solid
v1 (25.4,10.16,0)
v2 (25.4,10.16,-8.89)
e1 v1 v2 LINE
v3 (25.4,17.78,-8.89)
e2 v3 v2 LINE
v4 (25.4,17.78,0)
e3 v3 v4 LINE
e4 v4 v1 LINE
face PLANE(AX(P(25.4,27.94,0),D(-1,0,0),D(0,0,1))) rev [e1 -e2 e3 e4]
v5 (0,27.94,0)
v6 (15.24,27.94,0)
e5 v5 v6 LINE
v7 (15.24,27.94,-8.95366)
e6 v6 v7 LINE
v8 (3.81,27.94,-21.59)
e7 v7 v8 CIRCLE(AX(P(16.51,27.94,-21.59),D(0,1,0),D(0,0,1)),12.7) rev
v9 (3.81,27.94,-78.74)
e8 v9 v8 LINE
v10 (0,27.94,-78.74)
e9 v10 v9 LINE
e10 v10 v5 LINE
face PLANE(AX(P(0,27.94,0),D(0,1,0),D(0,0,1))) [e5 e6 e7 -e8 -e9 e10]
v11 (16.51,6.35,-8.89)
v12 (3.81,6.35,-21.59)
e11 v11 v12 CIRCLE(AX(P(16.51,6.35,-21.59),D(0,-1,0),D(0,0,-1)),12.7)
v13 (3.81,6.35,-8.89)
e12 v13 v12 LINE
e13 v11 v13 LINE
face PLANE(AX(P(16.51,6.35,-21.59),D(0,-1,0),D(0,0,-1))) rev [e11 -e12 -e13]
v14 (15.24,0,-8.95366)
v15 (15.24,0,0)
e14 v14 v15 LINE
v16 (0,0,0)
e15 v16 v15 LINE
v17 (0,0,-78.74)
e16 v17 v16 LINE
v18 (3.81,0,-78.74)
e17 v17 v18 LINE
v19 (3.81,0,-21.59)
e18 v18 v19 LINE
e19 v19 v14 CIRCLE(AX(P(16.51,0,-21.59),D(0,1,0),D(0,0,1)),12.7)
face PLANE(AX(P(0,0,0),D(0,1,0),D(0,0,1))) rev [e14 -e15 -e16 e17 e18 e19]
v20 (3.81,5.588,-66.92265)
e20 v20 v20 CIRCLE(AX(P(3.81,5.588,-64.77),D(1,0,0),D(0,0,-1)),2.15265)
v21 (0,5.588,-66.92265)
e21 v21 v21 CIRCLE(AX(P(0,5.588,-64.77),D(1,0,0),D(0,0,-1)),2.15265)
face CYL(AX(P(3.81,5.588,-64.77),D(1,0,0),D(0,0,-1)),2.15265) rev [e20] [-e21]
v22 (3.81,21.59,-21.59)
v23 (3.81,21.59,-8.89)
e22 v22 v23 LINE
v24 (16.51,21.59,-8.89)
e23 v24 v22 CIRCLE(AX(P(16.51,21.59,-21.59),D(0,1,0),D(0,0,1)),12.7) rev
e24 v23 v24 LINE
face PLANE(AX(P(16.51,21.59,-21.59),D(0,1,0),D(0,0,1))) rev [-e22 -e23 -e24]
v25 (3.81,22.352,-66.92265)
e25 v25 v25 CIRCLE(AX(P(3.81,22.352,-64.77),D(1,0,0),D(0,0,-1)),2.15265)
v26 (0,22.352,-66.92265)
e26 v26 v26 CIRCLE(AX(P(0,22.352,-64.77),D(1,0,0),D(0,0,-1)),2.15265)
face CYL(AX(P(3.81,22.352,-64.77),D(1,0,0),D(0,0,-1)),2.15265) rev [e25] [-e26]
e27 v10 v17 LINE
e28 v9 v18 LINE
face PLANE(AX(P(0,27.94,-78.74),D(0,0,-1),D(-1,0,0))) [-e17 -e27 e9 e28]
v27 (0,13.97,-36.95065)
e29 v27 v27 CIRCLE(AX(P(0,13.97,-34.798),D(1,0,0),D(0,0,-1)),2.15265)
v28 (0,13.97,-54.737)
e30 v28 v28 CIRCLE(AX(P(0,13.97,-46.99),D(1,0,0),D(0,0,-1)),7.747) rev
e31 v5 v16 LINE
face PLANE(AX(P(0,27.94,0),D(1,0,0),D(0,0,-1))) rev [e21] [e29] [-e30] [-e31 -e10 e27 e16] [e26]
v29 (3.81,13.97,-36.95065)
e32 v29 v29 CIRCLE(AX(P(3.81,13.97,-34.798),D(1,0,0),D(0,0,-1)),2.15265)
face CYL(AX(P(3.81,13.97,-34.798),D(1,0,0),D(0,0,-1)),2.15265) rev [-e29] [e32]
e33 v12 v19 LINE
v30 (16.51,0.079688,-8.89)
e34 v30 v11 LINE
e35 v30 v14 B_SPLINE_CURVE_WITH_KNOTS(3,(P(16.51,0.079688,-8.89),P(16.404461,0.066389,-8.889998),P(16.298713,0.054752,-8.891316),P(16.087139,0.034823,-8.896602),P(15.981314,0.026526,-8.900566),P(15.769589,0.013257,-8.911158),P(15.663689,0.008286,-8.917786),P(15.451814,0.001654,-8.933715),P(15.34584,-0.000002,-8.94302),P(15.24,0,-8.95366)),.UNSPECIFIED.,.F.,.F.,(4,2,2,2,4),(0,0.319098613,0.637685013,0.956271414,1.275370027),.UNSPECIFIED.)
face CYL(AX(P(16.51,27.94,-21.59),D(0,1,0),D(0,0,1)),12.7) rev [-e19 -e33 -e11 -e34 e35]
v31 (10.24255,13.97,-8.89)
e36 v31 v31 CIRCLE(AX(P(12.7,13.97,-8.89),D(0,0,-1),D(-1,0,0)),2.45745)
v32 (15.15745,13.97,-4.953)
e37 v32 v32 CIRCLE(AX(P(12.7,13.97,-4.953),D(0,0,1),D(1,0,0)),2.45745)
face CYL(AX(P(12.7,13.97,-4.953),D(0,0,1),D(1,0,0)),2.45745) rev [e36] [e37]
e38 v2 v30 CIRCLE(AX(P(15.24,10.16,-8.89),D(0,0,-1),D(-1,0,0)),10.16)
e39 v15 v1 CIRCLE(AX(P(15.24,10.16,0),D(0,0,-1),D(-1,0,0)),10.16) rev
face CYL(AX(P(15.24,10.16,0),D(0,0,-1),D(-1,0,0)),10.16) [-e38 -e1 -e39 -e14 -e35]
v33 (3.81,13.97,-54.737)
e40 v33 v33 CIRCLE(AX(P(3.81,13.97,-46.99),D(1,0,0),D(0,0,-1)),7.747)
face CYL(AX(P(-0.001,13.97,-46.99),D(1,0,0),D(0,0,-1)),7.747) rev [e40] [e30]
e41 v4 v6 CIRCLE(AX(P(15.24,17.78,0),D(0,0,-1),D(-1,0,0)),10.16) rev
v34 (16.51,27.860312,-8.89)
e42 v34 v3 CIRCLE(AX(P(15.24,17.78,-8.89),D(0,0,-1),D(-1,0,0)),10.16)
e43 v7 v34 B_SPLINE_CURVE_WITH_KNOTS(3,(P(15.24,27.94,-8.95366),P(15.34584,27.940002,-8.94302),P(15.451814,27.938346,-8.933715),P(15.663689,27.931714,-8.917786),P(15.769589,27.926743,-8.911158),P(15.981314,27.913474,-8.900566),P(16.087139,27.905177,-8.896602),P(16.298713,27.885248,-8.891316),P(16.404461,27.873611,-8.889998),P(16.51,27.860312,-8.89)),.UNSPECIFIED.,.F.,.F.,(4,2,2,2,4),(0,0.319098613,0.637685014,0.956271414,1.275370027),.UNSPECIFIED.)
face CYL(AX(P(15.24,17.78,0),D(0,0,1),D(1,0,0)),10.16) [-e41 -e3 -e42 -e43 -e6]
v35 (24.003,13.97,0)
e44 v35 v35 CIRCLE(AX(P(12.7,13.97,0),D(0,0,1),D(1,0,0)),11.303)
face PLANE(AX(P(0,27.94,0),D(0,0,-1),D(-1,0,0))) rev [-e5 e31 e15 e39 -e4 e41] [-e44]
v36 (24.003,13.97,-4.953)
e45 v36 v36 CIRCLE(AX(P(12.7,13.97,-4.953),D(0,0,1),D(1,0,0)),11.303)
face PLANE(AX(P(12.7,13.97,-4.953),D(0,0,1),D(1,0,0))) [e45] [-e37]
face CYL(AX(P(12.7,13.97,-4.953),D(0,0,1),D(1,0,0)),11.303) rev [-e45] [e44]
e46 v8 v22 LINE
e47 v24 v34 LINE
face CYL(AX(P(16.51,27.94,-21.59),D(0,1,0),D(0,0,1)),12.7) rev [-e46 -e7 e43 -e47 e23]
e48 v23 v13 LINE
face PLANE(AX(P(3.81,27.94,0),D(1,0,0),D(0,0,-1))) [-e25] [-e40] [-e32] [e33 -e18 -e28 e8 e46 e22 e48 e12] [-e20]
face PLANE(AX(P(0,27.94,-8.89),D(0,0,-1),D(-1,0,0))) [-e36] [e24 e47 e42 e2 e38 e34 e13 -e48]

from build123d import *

# Parameters (mm, degrees)
SKETCH1_W                 = 3.81
SKETCH1_H                 = 78.74
SKETCH1_W_2               = 21.59
SKETCH1_H_2               = 8.89
BOSS_EXTRUDE1_DEPTH       = 27.94
SKETCH2_R                 = 11.303
CUT_EXTRUDE1_DEPTH        = 4.953
F_8_CLEARANCE_HOLE1_D     = 4.9149
CUT_EXTRUDE4_REACH        = 88.295
SKETCH5_R                 = 7.747
F_6_CLEARANCE_HOLE1_D     = 4.3053
F_6_CLEARANCE_HOLE1_DEPTH = 3.81
FILLET1_DEPTH             = 6.35
FILLET2_START             = 21.59
FILLET2_DEPTH             = 6.35
FILLET3_R                 = 10.16


with BuildPart() as part:
    # Sketch1 → Boss-Extrude1 (new body)
    with BuildSketch(Plane(origin=(0, 0, 0), x_dir=(1, 0, 0), z_dir=(0, 1, 0))):
        with Locations((1.905, 39.37)):
            Rectangle(SKETCH1_W, SKETCH1_H)
        with Locations((14.605, 4.445)):
            Rectangle(SKETCH1_W_2, SKETCH1_H_2)
    extrude(amount=BOSS_EXTRUDE1_DEPTH)

    # Sketch2 → Cut-Extrude1 (cut)
    with BuildSketch(Plane.XY):
        with Locations((12.7, 13.97)):
            Circle(SKETCH2_R)
    extrude(amount=-CUT_EXTRUDE1_DEPTH, mode=Mode.SUBTRACT)

    # #8 Clearance Hole1 (through all)
    with Locations(Plane.XY.offset(-4.953)):
        with Locations((12.7, 13.97)):
            Hole(F_8_CLEARANCE_HOLE1_D / 2)

    # Sketch5 → Cut-Extrude4 (cut, up to next)
    with BuildSketch(Plane(origin=(3.81, 0, 0), x_dir=(0, 0, -1), z_dir=(1, 0, 0)), mode=Mode.PRIVATE) as cut_extrude4_sk1:
        with Locations((46.99, 13.97)):
            Circle(SKETCH5_R)
    cut_extrude4_tool1 = extrude(cut_extrude4_sk1.sketch, amount=-CUT_EXTRUDE4_REACH, mode=Mode.PRIVATE) & part.part
    # Sketch5 → Cut-Extrude4 (cut, up to next)
    with BuildSketch(Plane(origin=(3.81, 0, 0), x_dir=(0, 0, -1), z_dir=(1, 0, 0)), mode=Mode.PRIVATE) as cut_extrude4_sk2:
        with BuildLine():
            ThreePointArc((54.737, 13.97), (46.99, 21.717), (39.243, 13.97))
            Line((39.243, 13.97), (54.737, 13.97))
        make_face()
    cut_extrude4_tool2 = extrude(cut_extrude4_sk2.sketch, amount=-CUT_EXTRUDE4_REACH, mode=Mode.PRIVATE) & part.part
    # Sketch5 → Cut-Extrude4 (cut, up to next)
    with BuildSketch(Plane(origin=(3.81, 0, 0), x_dir=(0, 0, -1), z_dir=(1, 0, 0)), mode=Mode.PRIVATE) as cut_extrude4_sk3:
        with BuildLine():
            Line((54.737, 13.97), (39.243, 13.97))
            ThreePointArc((39.243, 13.97), (46.99, 6.223), (54.737, 13.97))
        make_face()
    cut_extrude4_tool3 = extrude(cut_extrude4_sk3.sketch, amount=-CUT_EXTRUDE4_REACH, mode=Mode.PRIVATE) & part.part
    add(cut_extrude4_tool1.solids().sort_by_distance((3.81, 13.97, -46.99))[0], mode=Mode.SUBTRACT)
    add(cut_extrude4_tool2.solids().sort_by_distance((3.81, 17.257929, -46.99))[0], mode=Mode.SUBTRACT)
    add(cut_extrude4_tool3.solids().sort_by_distance((3.81, 10.682071, -46.99))[0], mode=Mode.SUBTRACT)

    # #6 Clearance Hole1
    with Locations(Plane(origin=(3.81, 0, 0), x_dir=(0, 0, -1), z_dir=(1, 0, 0))):
        with Locations((34.798, 13.97), (46.99, 13.97), (64.77, 22.352), (64.77, 5.588)):
            Hole(F_6_CLEARANCE_HOLE1_D / 2, depth=F_6_CLEARANCE_HOLE1_DEPTH)

    # Fillet1: read off the stored shape, not the designer's step
    # Fillet1 outline → Fillet1 (add)
    with BuildSketch(Plane(origin=(0, 0, 0), x_dir=(1, 0, 0), z_dir=(0, 1, 0))):
        with BuildLine():
            ThreePointArc((16.51, 8.89), (7.529743879, 12.609743879), (3.81, 21.59))
            Line((3.81, 21.59), (3.81, 8.89))
            Line((3.81, 8.89), (16.51, 8.89))
        make_face()
    extrude(amount=FILLET1_DEPTH)

    # Fillet2: read off the stored shape, not the designer's step
    # Fillet2 outline → Fillet2 (add)
    with BuildSketch(Plane(origin=(0, 0, 0), x_dir=(1, 0, 0), z_dir=(0, 1, 0)).offset(FILLET2_START)):
        with BuildLine():
            ThreePointArc((16.51, 8.89), (7.529743879, 12.609743879), (3.81, 21.59))
            Line((3.81, 21.59), (3.81, 8.89))
            Line((3.81, 8.89), (16.51, 8.89))
        make_face()
    extrude(amount=FILLET2_DEPTH)

    # Fillet3
    fillet3_edges = [part.edges().sort_by_distance(p)[0] for p in [
        (25.4, 0, -4.445),
        (25.4, 27.94, -4.445),
    ]]
    fillet(fillet3_edges, radius=FILLET3_R)


solid = part.part
